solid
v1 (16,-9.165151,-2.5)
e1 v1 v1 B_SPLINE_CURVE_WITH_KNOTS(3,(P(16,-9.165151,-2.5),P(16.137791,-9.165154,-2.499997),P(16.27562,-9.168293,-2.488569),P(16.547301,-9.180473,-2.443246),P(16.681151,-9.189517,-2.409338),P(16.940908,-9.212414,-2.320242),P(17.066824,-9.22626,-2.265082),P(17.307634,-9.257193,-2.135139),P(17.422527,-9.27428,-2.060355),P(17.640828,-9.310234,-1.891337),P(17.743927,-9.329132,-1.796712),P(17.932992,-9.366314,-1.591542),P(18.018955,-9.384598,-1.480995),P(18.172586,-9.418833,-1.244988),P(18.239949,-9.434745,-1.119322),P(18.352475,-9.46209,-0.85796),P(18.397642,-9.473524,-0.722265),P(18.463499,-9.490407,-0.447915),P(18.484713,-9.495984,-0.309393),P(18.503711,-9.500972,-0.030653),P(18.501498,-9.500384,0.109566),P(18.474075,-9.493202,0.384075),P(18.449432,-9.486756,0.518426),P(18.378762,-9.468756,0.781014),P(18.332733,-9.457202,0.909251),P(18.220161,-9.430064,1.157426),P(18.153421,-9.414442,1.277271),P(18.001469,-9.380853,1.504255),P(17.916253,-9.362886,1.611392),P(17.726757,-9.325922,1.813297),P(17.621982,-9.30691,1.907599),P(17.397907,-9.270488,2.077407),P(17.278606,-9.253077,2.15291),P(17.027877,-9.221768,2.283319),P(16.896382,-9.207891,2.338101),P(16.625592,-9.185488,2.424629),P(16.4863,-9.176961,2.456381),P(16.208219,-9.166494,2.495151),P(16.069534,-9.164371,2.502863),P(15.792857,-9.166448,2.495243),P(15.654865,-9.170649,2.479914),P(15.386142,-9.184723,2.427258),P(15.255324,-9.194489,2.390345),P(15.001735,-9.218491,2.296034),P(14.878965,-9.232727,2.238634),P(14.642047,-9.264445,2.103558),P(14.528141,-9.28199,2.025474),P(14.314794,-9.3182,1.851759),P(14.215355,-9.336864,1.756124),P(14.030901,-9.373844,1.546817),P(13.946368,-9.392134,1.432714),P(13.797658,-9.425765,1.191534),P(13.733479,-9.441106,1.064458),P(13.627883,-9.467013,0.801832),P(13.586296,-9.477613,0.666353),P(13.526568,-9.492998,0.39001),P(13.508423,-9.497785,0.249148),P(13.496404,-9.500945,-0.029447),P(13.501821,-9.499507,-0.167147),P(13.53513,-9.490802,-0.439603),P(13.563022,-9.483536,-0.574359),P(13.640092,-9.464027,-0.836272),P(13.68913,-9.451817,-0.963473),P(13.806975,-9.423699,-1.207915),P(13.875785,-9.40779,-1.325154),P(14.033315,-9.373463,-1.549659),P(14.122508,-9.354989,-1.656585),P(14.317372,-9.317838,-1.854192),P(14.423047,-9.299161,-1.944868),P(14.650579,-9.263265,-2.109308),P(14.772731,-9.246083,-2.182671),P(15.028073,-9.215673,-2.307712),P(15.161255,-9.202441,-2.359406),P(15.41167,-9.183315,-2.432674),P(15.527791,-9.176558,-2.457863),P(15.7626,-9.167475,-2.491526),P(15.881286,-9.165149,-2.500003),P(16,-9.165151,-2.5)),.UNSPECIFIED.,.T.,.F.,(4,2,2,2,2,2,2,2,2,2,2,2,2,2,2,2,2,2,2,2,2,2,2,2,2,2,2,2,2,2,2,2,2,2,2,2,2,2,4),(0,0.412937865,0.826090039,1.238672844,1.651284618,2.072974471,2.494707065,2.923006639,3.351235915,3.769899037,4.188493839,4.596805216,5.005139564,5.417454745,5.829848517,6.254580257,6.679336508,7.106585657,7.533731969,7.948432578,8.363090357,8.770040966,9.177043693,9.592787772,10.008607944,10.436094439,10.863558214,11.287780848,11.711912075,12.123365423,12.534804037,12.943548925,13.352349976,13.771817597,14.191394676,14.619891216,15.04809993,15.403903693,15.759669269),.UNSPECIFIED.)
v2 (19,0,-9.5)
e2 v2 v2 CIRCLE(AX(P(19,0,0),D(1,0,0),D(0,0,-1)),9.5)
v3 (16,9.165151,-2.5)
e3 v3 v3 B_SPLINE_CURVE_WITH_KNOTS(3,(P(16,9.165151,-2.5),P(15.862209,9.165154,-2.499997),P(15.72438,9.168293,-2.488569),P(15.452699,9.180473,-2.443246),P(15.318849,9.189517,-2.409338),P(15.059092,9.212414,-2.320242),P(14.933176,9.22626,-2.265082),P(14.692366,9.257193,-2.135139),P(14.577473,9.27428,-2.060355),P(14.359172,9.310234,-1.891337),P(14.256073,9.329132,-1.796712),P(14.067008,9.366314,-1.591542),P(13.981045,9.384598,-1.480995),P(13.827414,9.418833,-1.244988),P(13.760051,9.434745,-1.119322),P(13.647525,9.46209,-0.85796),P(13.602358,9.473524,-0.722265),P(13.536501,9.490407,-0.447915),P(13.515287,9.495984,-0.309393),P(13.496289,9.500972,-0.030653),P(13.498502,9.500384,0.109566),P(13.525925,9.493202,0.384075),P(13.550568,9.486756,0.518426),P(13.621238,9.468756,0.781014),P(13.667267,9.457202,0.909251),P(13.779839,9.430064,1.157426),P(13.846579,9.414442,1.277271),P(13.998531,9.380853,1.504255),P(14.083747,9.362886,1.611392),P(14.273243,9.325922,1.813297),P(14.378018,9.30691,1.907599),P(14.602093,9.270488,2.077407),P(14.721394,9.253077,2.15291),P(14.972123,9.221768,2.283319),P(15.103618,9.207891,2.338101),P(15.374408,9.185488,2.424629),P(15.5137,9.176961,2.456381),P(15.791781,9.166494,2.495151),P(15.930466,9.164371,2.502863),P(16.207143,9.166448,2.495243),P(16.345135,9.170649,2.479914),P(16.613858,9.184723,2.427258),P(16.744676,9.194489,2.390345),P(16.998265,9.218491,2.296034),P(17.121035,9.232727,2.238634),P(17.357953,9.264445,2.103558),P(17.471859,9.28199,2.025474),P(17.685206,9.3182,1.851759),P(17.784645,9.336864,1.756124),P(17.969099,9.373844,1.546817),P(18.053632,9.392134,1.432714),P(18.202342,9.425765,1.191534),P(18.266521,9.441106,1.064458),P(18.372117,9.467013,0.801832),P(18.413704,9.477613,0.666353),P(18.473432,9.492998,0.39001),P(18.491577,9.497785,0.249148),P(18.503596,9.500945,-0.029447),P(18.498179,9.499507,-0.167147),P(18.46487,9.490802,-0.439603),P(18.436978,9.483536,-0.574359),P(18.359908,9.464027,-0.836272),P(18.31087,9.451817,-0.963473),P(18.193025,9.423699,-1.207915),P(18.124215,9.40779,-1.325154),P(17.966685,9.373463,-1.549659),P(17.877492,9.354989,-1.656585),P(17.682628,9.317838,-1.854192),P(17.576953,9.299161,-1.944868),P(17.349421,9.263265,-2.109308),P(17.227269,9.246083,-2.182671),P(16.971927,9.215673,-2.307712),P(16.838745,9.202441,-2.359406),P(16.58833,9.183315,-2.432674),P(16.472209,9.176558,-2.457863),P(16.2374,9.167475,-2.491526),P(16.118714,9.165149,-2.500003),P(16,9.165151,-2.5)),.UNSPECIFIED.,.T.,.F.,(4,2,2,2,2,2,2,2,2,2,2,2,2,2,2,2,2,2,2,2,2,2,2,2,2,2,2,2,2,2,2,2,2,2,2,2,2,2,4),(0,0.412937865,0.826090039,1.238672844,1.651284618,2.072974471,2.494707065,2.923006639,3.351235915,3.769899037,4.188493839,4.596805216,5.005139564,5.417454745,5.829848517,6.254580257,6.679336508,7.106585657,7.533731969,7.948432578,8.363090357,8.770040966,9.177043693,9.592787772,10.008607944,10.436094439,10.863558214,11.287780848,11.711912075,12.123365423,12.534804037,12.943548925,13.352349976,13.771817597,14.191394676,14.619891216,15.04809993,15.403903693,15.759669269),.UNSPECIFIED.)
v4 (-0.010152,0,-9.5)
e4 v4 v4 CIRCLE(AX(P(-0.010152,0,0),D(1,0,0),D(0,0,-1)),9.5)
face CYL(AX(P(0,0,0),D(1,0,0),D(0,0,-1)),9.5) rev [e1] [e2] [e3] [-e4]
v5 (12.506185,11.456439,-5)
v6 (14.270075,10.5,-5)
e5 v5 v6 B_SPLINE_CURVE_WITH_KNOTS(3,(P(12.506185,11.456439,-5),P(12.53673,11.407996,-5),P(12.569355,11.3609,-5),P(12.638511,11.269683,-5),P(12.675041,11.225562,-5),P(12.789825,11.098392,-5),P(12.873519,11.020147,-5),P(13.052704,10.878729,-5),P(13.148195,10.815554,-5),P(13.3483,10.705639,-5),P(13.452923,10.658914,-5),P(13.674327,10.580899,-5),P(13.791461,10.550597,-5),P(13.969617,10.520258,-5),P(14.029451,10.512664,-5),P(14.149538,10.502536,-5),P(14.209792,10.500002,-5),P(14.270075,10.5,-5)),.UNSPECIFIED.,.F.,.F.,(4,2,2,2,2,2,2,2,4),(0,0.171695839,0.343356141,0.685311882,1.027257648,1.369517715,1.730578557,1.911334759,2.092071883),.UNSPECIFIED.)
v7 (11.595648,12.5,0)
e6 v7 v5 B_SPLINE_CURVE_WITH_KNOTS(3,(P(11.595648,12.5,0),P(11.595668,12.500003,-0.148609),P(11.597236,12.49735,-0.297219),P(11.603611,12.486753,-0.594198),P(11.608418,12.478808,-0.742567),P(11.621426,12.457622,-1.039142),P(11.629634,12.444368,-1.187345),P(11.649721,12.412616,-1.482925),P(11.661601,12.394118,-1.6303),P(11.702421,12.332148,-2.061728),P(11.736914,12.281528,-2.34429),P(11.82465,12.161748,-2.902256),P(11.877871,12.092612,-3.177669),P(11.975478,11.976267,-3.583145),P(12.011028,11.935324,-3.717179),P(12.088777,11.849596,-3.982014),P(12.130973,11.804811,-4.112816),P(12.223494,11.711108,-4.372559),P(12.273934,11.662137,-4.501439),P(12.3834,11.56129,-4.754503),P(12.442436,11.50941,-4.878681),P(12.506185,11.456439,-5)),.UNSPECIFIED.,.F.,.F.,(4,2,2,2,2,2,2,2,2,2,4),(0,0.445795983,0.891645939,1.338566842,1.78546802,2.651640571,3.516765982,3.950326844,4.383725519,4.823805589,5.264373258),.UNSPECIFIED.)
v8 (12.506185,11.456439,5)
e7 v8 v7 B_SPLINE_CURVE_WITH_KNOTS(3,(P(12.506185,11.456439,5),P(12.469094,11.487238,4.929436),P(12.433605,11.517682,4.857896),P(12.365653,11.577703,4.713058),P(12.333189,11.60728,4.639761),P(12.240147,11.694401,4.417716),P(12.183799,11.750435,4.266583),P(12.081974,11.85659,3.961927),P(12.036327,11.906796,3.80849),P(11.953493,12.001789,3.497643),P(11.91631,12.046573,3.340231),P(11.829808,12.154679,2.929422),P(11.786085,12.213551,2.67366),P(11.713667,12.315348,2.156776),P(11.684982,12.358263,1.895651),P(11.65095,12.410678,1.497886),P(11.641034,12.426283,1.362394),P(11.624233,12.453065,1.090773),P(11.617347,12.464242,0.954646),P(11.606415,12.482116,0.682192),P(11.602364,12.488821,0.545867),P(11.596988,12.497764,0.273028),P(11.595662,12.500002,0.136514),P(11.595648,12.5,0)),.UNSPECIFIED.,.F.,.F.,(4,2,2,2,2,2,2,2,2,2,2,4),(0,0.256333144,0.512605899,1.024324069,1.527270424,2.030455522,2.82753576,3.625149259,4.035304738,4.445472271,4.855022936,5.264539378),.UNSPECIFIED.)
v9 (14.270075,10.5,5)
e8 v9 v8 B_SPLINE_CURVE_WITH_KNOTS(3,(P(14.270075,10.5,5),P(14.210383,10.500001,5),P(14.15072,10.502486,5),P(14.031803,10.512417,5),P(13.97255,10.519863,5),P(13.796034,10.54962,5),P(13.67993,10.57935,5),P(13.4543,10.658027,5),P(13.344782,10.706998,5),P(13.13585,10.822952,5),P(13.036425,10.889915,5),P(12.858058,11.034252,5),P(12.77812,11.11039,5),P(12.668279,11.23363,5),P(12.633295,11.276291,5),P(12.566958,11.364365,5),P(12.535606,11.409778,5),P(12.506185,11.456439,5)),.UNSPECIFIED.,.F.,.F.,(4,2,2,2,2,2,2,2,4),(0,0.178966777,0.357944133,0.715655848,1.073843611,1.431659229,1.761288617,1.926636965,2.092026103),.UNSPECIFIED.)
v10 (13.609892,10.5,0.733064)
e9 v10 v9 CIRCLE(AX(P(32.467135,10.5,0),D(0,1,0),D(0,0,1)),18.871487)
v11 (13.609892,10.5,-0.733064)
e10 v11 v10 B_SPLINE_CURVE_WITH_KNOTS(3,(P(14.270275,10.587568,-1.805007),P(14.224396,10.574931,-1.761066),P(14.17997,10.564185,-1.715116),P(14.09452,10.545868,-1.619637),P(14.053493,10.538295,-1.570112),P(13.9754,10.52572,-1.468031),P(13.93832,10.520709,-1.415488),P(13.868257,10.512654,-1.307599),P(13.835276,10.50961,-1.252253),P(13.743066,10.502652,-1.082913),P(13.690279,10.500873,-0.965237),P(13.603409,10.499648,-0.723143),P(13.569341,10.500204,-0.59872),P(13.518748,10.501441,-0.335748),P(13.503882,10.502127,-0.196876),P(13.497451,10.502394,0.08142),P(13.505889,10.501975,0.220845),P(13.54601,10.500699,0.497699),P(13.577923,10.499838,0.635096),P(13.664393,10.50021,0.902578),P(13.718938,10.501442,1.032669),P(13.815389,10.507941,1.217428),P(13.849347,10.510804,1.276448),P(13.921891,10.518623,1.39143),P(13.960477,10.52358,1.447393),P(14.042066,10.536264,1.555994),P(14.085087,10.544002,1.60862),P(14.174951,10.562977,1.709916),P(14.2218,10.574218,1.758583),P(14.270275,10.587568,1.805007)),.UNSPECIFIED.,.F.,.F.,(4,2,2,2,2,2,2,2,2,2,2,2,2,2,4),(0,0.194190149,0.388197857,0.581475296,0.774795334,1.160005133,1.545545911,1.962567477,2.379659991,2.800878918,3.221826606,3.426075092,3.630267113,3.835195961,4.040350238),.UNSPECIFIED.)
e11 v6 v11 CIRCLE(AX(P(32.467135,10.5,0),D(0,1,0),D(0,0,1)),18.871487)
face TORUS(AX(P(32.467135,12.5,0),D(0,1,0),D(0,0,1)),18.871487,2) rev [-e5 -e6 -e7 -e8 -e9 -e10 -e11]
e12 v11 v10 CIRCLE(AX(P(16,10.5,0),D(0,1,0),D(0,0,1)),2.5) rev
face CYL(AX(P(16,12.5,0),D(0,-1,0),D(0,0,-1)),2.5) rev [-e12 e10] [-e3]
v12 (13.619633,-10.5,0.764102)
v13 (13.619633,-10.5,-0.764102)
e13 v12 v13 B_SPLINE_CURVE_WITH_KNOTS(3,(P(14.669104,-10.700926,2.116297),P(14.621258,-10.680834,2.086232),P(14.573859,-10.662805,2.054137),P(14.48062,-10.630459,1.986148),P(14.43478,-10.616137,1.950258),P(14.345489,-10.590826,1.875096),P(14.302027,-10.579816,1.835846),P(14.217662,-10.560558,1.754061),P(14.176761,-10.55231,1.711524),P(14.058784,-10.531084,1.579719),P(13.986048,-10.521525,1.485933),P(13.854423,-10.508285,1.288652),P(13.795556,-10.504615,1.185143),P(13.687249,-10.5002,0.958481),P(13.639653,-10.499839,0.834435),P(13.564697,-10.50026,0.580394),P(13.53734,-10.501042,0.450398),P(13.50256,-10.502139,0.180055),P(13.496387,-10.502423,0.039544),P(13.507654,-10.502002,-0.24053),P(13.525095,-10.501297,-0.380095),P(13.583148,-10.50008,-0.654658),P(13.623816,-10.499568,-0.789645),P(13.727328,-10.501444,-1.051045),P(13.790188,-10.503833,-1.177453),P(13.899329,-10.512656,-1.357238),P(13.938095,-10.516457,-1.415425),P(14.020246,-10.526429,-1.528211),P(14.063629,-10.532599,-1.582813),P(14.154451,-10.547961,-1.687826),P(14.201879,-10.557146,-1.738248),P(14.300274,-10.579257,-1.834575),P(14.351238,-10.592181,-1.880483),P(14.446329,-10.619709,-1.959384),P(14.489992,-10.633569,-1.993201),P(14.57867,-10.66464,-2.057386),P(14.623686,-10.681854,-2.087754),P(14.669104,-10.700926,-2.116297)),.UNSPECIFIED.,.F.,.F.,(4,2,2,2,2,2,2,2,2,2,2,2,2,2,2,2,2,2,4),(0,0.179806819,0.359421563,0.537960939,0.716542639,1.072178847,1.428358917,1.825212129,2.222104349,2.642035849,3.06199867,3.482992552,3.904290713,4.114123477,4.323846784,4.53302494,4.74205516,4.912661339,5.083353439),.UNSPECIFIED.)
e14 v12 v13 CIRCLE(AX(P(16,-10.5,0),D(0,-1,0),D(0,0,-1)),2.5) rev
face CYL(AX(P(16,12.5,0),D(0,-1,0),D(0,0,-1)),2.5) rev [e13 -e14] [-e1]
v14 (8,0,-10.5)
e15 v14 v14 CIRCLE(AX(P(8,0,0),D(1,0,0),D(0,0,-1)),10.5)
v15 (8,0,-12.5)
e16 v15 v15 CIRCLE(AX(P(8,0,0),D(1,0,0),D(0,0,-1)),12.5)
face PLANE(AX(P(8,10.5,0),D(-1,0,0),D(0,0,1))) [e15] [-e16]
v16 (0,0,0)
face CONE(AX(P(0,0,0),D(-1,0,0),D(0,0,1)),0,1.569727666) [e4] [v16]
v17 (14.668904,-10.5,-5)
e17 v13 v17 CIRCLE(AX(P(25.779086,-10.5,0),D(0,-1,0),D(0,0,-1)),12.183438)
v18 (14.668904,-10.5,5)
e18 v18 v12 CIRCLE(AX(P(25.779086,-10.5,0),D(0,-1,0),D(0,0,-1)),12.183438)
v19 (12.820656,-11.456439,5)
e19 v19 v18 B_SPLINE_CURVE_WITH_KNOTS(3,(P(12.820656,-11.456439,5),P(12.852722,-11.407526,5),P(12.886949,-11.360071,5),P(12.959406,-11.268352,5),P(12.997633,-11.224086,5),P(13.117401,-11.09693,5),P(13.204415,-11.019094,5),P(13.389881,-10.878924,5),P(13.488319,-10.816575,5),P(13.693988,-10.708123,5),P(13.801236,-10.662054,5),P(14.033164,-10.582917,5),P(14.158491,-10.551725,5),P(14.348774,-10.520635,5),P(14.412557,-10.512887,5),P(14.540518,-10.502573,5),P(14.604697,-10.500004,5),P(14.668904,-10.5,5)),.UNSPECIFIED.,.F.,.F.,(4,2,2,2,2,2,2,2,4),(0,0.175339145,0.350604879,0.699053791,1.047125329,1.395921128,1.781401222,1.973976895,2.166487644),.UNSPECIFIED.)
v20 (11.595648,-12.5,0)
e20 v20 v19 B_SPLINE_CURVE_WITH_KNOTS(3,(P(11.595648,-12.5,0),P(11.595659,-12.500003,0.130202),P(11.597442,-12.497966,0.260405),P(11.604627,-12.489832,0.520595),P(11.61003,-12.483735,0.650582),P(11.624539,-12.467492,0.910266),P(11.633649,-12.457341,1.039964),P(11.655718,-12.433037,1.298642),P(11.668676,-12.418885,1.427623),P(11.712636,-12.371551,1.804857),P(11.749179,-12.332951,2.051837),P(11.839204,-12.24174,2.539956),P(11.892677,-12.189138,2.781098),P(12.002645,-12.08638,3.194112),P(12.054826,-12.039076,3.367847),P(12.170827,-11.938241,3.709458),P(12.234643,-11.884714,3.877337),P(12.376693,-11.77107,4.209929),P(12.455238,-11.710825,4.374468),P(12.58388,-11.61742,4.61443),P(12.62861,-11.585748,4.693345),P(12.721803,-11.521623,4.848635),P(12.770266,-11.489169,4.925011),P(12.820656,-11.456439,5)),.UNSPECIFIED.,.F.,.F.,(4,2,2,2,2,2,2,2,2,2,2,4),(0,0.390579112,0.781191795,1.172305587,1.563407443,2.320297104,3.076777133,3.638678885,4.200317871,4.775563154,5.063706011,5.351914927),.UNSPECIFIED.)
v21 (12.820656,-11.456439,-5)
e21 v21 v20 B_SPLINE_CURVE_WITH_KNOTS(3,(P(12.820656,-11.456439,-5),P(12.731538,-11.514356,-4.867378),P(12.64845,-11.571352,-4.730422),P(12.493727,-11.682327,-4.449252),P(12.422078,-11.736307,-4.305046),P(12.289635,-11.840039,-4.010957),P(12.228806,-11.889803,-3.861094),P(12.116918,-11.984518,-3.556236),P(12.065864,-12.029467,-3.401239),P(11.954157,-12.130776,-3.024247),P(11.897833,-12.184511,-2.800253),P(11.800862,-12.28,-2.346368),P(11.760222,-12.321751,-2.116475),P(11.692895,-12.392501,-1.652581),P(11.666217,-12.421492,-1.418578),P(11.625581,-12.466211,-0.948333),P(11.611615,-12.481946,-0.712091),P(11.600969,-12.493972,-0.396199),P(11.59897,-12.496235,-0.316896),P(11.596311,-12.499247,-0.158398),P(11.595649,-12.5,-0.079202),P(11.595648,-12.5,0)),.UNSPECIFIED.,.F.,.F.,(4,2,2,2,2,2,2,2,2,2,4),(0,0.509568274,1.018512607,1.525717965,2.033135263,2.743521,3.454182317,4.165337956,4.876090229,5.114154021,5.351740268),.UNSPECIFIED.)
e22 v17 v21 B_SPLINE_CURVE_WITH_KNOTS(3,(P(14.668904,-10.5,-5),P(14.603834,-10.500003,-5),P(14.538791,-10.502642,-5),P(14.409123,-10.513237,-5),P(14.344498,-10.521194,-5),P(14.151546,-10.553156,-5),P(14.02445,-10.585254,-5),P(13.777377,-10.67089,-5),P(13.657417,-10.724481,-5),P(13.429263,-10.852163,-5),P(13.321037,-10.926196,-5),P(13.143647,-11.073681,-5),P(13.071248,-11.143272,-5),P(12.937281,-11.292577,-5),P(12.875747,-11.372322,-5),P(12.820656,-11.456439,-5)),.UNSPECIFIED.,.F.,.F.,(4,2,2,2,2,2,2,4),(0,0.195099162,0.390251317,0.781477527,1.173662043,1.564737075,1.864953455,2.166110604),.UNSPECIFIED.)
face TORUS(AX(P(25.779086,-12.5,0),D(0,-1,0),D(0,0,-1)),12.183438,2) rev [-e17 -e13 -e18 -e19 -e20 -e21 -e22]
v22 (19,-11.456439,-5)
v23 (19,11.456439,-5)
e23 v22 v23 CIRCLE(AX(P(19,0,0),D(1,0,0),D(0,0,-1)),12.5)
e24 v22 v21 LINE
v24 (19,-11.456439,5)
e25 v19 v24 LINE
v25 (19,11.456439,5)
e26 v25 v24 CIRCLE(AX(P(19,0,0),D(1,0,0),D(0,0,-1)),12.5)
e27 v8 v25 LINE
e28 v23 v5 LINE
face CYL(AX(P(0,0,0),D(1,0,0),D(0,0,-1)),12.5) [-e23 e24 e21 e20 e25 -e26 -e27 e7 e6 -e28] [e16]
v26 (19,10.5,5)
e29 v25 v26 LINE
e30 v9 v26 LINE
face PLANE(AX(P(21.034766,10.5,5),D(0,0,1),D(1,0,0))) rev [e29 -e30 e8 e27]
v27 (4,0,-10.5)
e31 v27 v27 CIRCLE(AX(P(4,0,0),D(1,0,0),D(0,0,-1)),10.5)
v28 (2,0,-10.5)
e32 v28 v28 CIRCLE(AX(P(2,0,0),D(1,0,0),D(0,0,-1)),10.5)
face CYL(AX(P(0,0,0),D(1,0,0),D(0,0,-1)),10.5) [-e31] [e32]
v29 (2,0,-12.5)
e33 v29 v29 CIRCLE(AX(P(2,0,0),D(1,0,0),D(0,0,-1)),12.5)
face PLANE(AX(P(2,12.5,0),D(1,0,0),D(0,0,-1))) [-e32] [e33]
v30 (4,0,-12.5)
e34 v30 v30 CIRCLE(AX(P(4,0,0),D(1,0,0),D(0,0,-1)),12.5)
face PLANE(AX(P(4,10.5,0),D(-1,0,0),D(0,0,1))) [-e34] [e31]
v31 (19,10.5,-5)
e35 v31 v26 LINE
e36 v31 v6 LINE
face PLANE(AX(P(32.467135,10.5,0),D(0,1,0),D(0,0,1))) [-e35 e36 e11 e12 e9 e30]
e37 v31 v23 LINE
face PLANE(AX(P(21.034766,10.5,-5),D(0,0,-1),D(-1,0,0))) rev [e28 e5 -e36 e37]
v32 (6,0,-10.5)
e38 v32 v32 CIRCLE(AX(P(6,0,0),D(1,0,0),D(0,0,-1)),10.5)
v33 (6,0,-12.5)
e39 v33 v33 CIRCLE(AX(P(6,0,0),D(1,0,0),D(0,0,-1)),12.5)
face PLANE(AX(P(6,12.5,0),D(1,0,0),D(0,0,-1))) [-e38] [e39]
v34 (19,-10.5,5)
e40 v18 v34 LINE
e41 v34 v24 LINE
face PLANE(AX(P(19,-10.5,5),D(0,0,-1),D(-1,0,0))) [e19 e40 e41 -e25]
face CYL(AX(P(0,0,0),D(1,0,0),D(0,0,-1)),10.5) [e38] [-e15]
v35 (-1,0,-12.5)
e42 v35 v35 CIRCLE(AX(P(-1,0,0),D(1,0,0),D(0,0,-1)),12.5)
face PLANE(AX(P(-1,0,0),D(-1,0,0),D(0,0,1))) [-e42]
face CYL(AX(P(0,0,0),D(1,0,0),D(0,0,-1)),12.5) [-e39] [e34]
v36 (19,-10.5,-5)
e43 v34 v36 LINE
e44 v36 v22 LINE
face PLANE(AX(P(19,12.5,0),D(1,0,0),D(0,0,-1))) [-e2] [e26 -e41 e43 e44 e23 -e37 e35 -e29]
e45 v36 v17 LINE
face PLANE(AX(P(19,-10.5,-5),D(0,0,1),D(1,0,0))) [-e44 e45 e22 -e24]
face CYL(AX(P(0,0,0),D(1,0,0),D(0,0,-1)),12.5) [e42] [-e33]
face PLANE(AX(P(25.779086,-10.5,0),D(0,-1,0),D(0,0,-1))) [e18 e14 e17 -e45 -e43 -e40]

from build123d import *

# Parameters (mm, degrees)
CUT_EXTRUDE2_DEPTH = 2
FILLET1_R          = 2
CUT_EXTRUDE3_DEPTH = 2
FILLET2_R          = 2
SKETCH7_R          = 2.5
CUT_EXTRUDE4_DEPTH = 34.797190672


with BuildPart() as part:
    # Sketch1 → Revolve1 (revolve)
    with BuildSketch(Plane.XY, mode=Mode.PRIVATE) as revolve1_sk:
        Polygon((0, 0), (-1, 0), (-1, 12.5), (2, 12.5), (2, 10.5), (4, 10.5), (4, 12.5), (6, 12.5), (6, 10.5), (8, 10.5), (8, 12.5), (19, 12.5), (19, 9.5), (-0.010152284, 9.5), align=None)
    revolve(revolve1_sk.sketch.rotate(Axis((0, 0, 0), (-1, 0, 0)), 90), axis=Axis((0, 0, 0), (-1, 0, 0)))

    # Sketch4 → Cut-Extrude2 (cut)
    with BuildSketch(Plane(origin=(0, 12.5, 0), x_dir=(1, 0, 0), z_dir=(0, 1, 0))):
        with BuildLine():
            Line((21.034766018, -5), (21.034766018, 5))
            Line((21.034766018, 5), (12.203400087, 5))
            ThreePointArc((12.203400087, 5), (11.59564841, 0), (12.203400087, -5))
            Line((12.203400087, -5), (21.034766018, -5))
        make_face()
    extrude(amount=-CUT_EXTRUDE2_DEPTH, mode=Mode.SUBTRACT)

    # Fillet1
    # the kernel refuses this fillet: 2 mm, written as the material it adds along each edge
    with BuildSketch(Plane(origin=(32.467135125, 10.5, 0), x_dir=(-0.8863085047711677, 0, -0.46309527569421044), z_dir=(0.46309527569421044, 0, -0.8863085047711677))) as fillet1_piece_1_section:
        with BuildLine():
            CenterArc((20.871486715 - FILLET1_R, FILLET1_R), FILLET1_R, 270, 90)
            Line((20.871486715, FILLET1_R), (20.871486715, 0))
            Line((20.871486715, 0), (20.871486715 - FILLET1_R, 0))
        make_face()
    fillet1_piece_1 = revolve(axis=Axis((32.467135125, 10.5, 0), (0, 1, 0)), revolution_arc=55.174042112, mode=Mode.PRIVATE)
    fillet1_piece_1 = fillet1_piece_1 & Plane(origin=(12.25218062, 0, 0), x_dir=(0, 0, -1), z_dir=(1, 0, 0)) * Cylinder(12.5, 84, mode=Mode.PRIVATE)
    add(fillet1_piece_1)

    # Sketch6 → Cut-Extrude3 (cut)
    with BuildSketch(Plane(origin=(0, -12.5, 0), x_dir=(1, 0, 0), z_dir=(0, 1, 0))):
        with BuildLine():
            Line((19, -5), (12.506184944, -5))
            ThreePointArc((12.506184944, -5), (11.59564841, 0), (12.506184944, 5))
            Line((12.506184944, 5), (19, 5))
            Line((19, 5), (19, -5))
        make_face()
    extrude(amount=CUT_EXTRUDE3_DEPTH, mode=Mode.SUBTRACT)

    # Fillet2
    # the kernel refuses this fillet: 2 mm, written as the material it adds along each edge
    with BuildSketch(Plane(origin=(25.779086317, -10.5, 0), x_dir=(-0.7565204646440288, 0, 0.6539700196299391), z_dir=(0.6539700196299391, 0, 0.7565204646440288))) as fillet2_piece_1_section:
        with BuildLine():
            CenterArc((14.183437907 - FILLET2_R, FILLET2_R), FILLET2_R, 270, 90)
            Line((14.183437907, FILLET2_R), (14.183437907, 0))
            Line((14.183437907, 0), (14.183437907 - FILLET2_R, 0))
        make_face()
    fillet2_piece_1 = revolve(axis=Axis((25.779086317, -10.5, 0), (0, -1, 0)), revolution_arc=81.683194908, mode=Mode.PRIVATE)
    fillet2_piece_1 = fillet2_piece_1 & Plane(origin=(12.166922866, 0, 0), x_dir=(0, 0, -1), z_dir=(1, 0, 0)) * Cylinder(12.5, 57, mode=Mode.PRIVATE)
    add(fillet2_piece_1)

    # Sketch7 → Cut-Extrude4 (cut, through all)
    with BuildSketch(Plane(origin=(0, -12.5, 0), x_dir=(1, 0, 0), z_dir=(0, 1, 0))):
        with Locations(Location((16, 0, 0), (0, 0, 90))):
            Circle(SKETCH7_R)
    extrude(amount=CUT_EXTRUDE4_DEPTH, mode=Mode.SUBTRACT)


solid = part.part
